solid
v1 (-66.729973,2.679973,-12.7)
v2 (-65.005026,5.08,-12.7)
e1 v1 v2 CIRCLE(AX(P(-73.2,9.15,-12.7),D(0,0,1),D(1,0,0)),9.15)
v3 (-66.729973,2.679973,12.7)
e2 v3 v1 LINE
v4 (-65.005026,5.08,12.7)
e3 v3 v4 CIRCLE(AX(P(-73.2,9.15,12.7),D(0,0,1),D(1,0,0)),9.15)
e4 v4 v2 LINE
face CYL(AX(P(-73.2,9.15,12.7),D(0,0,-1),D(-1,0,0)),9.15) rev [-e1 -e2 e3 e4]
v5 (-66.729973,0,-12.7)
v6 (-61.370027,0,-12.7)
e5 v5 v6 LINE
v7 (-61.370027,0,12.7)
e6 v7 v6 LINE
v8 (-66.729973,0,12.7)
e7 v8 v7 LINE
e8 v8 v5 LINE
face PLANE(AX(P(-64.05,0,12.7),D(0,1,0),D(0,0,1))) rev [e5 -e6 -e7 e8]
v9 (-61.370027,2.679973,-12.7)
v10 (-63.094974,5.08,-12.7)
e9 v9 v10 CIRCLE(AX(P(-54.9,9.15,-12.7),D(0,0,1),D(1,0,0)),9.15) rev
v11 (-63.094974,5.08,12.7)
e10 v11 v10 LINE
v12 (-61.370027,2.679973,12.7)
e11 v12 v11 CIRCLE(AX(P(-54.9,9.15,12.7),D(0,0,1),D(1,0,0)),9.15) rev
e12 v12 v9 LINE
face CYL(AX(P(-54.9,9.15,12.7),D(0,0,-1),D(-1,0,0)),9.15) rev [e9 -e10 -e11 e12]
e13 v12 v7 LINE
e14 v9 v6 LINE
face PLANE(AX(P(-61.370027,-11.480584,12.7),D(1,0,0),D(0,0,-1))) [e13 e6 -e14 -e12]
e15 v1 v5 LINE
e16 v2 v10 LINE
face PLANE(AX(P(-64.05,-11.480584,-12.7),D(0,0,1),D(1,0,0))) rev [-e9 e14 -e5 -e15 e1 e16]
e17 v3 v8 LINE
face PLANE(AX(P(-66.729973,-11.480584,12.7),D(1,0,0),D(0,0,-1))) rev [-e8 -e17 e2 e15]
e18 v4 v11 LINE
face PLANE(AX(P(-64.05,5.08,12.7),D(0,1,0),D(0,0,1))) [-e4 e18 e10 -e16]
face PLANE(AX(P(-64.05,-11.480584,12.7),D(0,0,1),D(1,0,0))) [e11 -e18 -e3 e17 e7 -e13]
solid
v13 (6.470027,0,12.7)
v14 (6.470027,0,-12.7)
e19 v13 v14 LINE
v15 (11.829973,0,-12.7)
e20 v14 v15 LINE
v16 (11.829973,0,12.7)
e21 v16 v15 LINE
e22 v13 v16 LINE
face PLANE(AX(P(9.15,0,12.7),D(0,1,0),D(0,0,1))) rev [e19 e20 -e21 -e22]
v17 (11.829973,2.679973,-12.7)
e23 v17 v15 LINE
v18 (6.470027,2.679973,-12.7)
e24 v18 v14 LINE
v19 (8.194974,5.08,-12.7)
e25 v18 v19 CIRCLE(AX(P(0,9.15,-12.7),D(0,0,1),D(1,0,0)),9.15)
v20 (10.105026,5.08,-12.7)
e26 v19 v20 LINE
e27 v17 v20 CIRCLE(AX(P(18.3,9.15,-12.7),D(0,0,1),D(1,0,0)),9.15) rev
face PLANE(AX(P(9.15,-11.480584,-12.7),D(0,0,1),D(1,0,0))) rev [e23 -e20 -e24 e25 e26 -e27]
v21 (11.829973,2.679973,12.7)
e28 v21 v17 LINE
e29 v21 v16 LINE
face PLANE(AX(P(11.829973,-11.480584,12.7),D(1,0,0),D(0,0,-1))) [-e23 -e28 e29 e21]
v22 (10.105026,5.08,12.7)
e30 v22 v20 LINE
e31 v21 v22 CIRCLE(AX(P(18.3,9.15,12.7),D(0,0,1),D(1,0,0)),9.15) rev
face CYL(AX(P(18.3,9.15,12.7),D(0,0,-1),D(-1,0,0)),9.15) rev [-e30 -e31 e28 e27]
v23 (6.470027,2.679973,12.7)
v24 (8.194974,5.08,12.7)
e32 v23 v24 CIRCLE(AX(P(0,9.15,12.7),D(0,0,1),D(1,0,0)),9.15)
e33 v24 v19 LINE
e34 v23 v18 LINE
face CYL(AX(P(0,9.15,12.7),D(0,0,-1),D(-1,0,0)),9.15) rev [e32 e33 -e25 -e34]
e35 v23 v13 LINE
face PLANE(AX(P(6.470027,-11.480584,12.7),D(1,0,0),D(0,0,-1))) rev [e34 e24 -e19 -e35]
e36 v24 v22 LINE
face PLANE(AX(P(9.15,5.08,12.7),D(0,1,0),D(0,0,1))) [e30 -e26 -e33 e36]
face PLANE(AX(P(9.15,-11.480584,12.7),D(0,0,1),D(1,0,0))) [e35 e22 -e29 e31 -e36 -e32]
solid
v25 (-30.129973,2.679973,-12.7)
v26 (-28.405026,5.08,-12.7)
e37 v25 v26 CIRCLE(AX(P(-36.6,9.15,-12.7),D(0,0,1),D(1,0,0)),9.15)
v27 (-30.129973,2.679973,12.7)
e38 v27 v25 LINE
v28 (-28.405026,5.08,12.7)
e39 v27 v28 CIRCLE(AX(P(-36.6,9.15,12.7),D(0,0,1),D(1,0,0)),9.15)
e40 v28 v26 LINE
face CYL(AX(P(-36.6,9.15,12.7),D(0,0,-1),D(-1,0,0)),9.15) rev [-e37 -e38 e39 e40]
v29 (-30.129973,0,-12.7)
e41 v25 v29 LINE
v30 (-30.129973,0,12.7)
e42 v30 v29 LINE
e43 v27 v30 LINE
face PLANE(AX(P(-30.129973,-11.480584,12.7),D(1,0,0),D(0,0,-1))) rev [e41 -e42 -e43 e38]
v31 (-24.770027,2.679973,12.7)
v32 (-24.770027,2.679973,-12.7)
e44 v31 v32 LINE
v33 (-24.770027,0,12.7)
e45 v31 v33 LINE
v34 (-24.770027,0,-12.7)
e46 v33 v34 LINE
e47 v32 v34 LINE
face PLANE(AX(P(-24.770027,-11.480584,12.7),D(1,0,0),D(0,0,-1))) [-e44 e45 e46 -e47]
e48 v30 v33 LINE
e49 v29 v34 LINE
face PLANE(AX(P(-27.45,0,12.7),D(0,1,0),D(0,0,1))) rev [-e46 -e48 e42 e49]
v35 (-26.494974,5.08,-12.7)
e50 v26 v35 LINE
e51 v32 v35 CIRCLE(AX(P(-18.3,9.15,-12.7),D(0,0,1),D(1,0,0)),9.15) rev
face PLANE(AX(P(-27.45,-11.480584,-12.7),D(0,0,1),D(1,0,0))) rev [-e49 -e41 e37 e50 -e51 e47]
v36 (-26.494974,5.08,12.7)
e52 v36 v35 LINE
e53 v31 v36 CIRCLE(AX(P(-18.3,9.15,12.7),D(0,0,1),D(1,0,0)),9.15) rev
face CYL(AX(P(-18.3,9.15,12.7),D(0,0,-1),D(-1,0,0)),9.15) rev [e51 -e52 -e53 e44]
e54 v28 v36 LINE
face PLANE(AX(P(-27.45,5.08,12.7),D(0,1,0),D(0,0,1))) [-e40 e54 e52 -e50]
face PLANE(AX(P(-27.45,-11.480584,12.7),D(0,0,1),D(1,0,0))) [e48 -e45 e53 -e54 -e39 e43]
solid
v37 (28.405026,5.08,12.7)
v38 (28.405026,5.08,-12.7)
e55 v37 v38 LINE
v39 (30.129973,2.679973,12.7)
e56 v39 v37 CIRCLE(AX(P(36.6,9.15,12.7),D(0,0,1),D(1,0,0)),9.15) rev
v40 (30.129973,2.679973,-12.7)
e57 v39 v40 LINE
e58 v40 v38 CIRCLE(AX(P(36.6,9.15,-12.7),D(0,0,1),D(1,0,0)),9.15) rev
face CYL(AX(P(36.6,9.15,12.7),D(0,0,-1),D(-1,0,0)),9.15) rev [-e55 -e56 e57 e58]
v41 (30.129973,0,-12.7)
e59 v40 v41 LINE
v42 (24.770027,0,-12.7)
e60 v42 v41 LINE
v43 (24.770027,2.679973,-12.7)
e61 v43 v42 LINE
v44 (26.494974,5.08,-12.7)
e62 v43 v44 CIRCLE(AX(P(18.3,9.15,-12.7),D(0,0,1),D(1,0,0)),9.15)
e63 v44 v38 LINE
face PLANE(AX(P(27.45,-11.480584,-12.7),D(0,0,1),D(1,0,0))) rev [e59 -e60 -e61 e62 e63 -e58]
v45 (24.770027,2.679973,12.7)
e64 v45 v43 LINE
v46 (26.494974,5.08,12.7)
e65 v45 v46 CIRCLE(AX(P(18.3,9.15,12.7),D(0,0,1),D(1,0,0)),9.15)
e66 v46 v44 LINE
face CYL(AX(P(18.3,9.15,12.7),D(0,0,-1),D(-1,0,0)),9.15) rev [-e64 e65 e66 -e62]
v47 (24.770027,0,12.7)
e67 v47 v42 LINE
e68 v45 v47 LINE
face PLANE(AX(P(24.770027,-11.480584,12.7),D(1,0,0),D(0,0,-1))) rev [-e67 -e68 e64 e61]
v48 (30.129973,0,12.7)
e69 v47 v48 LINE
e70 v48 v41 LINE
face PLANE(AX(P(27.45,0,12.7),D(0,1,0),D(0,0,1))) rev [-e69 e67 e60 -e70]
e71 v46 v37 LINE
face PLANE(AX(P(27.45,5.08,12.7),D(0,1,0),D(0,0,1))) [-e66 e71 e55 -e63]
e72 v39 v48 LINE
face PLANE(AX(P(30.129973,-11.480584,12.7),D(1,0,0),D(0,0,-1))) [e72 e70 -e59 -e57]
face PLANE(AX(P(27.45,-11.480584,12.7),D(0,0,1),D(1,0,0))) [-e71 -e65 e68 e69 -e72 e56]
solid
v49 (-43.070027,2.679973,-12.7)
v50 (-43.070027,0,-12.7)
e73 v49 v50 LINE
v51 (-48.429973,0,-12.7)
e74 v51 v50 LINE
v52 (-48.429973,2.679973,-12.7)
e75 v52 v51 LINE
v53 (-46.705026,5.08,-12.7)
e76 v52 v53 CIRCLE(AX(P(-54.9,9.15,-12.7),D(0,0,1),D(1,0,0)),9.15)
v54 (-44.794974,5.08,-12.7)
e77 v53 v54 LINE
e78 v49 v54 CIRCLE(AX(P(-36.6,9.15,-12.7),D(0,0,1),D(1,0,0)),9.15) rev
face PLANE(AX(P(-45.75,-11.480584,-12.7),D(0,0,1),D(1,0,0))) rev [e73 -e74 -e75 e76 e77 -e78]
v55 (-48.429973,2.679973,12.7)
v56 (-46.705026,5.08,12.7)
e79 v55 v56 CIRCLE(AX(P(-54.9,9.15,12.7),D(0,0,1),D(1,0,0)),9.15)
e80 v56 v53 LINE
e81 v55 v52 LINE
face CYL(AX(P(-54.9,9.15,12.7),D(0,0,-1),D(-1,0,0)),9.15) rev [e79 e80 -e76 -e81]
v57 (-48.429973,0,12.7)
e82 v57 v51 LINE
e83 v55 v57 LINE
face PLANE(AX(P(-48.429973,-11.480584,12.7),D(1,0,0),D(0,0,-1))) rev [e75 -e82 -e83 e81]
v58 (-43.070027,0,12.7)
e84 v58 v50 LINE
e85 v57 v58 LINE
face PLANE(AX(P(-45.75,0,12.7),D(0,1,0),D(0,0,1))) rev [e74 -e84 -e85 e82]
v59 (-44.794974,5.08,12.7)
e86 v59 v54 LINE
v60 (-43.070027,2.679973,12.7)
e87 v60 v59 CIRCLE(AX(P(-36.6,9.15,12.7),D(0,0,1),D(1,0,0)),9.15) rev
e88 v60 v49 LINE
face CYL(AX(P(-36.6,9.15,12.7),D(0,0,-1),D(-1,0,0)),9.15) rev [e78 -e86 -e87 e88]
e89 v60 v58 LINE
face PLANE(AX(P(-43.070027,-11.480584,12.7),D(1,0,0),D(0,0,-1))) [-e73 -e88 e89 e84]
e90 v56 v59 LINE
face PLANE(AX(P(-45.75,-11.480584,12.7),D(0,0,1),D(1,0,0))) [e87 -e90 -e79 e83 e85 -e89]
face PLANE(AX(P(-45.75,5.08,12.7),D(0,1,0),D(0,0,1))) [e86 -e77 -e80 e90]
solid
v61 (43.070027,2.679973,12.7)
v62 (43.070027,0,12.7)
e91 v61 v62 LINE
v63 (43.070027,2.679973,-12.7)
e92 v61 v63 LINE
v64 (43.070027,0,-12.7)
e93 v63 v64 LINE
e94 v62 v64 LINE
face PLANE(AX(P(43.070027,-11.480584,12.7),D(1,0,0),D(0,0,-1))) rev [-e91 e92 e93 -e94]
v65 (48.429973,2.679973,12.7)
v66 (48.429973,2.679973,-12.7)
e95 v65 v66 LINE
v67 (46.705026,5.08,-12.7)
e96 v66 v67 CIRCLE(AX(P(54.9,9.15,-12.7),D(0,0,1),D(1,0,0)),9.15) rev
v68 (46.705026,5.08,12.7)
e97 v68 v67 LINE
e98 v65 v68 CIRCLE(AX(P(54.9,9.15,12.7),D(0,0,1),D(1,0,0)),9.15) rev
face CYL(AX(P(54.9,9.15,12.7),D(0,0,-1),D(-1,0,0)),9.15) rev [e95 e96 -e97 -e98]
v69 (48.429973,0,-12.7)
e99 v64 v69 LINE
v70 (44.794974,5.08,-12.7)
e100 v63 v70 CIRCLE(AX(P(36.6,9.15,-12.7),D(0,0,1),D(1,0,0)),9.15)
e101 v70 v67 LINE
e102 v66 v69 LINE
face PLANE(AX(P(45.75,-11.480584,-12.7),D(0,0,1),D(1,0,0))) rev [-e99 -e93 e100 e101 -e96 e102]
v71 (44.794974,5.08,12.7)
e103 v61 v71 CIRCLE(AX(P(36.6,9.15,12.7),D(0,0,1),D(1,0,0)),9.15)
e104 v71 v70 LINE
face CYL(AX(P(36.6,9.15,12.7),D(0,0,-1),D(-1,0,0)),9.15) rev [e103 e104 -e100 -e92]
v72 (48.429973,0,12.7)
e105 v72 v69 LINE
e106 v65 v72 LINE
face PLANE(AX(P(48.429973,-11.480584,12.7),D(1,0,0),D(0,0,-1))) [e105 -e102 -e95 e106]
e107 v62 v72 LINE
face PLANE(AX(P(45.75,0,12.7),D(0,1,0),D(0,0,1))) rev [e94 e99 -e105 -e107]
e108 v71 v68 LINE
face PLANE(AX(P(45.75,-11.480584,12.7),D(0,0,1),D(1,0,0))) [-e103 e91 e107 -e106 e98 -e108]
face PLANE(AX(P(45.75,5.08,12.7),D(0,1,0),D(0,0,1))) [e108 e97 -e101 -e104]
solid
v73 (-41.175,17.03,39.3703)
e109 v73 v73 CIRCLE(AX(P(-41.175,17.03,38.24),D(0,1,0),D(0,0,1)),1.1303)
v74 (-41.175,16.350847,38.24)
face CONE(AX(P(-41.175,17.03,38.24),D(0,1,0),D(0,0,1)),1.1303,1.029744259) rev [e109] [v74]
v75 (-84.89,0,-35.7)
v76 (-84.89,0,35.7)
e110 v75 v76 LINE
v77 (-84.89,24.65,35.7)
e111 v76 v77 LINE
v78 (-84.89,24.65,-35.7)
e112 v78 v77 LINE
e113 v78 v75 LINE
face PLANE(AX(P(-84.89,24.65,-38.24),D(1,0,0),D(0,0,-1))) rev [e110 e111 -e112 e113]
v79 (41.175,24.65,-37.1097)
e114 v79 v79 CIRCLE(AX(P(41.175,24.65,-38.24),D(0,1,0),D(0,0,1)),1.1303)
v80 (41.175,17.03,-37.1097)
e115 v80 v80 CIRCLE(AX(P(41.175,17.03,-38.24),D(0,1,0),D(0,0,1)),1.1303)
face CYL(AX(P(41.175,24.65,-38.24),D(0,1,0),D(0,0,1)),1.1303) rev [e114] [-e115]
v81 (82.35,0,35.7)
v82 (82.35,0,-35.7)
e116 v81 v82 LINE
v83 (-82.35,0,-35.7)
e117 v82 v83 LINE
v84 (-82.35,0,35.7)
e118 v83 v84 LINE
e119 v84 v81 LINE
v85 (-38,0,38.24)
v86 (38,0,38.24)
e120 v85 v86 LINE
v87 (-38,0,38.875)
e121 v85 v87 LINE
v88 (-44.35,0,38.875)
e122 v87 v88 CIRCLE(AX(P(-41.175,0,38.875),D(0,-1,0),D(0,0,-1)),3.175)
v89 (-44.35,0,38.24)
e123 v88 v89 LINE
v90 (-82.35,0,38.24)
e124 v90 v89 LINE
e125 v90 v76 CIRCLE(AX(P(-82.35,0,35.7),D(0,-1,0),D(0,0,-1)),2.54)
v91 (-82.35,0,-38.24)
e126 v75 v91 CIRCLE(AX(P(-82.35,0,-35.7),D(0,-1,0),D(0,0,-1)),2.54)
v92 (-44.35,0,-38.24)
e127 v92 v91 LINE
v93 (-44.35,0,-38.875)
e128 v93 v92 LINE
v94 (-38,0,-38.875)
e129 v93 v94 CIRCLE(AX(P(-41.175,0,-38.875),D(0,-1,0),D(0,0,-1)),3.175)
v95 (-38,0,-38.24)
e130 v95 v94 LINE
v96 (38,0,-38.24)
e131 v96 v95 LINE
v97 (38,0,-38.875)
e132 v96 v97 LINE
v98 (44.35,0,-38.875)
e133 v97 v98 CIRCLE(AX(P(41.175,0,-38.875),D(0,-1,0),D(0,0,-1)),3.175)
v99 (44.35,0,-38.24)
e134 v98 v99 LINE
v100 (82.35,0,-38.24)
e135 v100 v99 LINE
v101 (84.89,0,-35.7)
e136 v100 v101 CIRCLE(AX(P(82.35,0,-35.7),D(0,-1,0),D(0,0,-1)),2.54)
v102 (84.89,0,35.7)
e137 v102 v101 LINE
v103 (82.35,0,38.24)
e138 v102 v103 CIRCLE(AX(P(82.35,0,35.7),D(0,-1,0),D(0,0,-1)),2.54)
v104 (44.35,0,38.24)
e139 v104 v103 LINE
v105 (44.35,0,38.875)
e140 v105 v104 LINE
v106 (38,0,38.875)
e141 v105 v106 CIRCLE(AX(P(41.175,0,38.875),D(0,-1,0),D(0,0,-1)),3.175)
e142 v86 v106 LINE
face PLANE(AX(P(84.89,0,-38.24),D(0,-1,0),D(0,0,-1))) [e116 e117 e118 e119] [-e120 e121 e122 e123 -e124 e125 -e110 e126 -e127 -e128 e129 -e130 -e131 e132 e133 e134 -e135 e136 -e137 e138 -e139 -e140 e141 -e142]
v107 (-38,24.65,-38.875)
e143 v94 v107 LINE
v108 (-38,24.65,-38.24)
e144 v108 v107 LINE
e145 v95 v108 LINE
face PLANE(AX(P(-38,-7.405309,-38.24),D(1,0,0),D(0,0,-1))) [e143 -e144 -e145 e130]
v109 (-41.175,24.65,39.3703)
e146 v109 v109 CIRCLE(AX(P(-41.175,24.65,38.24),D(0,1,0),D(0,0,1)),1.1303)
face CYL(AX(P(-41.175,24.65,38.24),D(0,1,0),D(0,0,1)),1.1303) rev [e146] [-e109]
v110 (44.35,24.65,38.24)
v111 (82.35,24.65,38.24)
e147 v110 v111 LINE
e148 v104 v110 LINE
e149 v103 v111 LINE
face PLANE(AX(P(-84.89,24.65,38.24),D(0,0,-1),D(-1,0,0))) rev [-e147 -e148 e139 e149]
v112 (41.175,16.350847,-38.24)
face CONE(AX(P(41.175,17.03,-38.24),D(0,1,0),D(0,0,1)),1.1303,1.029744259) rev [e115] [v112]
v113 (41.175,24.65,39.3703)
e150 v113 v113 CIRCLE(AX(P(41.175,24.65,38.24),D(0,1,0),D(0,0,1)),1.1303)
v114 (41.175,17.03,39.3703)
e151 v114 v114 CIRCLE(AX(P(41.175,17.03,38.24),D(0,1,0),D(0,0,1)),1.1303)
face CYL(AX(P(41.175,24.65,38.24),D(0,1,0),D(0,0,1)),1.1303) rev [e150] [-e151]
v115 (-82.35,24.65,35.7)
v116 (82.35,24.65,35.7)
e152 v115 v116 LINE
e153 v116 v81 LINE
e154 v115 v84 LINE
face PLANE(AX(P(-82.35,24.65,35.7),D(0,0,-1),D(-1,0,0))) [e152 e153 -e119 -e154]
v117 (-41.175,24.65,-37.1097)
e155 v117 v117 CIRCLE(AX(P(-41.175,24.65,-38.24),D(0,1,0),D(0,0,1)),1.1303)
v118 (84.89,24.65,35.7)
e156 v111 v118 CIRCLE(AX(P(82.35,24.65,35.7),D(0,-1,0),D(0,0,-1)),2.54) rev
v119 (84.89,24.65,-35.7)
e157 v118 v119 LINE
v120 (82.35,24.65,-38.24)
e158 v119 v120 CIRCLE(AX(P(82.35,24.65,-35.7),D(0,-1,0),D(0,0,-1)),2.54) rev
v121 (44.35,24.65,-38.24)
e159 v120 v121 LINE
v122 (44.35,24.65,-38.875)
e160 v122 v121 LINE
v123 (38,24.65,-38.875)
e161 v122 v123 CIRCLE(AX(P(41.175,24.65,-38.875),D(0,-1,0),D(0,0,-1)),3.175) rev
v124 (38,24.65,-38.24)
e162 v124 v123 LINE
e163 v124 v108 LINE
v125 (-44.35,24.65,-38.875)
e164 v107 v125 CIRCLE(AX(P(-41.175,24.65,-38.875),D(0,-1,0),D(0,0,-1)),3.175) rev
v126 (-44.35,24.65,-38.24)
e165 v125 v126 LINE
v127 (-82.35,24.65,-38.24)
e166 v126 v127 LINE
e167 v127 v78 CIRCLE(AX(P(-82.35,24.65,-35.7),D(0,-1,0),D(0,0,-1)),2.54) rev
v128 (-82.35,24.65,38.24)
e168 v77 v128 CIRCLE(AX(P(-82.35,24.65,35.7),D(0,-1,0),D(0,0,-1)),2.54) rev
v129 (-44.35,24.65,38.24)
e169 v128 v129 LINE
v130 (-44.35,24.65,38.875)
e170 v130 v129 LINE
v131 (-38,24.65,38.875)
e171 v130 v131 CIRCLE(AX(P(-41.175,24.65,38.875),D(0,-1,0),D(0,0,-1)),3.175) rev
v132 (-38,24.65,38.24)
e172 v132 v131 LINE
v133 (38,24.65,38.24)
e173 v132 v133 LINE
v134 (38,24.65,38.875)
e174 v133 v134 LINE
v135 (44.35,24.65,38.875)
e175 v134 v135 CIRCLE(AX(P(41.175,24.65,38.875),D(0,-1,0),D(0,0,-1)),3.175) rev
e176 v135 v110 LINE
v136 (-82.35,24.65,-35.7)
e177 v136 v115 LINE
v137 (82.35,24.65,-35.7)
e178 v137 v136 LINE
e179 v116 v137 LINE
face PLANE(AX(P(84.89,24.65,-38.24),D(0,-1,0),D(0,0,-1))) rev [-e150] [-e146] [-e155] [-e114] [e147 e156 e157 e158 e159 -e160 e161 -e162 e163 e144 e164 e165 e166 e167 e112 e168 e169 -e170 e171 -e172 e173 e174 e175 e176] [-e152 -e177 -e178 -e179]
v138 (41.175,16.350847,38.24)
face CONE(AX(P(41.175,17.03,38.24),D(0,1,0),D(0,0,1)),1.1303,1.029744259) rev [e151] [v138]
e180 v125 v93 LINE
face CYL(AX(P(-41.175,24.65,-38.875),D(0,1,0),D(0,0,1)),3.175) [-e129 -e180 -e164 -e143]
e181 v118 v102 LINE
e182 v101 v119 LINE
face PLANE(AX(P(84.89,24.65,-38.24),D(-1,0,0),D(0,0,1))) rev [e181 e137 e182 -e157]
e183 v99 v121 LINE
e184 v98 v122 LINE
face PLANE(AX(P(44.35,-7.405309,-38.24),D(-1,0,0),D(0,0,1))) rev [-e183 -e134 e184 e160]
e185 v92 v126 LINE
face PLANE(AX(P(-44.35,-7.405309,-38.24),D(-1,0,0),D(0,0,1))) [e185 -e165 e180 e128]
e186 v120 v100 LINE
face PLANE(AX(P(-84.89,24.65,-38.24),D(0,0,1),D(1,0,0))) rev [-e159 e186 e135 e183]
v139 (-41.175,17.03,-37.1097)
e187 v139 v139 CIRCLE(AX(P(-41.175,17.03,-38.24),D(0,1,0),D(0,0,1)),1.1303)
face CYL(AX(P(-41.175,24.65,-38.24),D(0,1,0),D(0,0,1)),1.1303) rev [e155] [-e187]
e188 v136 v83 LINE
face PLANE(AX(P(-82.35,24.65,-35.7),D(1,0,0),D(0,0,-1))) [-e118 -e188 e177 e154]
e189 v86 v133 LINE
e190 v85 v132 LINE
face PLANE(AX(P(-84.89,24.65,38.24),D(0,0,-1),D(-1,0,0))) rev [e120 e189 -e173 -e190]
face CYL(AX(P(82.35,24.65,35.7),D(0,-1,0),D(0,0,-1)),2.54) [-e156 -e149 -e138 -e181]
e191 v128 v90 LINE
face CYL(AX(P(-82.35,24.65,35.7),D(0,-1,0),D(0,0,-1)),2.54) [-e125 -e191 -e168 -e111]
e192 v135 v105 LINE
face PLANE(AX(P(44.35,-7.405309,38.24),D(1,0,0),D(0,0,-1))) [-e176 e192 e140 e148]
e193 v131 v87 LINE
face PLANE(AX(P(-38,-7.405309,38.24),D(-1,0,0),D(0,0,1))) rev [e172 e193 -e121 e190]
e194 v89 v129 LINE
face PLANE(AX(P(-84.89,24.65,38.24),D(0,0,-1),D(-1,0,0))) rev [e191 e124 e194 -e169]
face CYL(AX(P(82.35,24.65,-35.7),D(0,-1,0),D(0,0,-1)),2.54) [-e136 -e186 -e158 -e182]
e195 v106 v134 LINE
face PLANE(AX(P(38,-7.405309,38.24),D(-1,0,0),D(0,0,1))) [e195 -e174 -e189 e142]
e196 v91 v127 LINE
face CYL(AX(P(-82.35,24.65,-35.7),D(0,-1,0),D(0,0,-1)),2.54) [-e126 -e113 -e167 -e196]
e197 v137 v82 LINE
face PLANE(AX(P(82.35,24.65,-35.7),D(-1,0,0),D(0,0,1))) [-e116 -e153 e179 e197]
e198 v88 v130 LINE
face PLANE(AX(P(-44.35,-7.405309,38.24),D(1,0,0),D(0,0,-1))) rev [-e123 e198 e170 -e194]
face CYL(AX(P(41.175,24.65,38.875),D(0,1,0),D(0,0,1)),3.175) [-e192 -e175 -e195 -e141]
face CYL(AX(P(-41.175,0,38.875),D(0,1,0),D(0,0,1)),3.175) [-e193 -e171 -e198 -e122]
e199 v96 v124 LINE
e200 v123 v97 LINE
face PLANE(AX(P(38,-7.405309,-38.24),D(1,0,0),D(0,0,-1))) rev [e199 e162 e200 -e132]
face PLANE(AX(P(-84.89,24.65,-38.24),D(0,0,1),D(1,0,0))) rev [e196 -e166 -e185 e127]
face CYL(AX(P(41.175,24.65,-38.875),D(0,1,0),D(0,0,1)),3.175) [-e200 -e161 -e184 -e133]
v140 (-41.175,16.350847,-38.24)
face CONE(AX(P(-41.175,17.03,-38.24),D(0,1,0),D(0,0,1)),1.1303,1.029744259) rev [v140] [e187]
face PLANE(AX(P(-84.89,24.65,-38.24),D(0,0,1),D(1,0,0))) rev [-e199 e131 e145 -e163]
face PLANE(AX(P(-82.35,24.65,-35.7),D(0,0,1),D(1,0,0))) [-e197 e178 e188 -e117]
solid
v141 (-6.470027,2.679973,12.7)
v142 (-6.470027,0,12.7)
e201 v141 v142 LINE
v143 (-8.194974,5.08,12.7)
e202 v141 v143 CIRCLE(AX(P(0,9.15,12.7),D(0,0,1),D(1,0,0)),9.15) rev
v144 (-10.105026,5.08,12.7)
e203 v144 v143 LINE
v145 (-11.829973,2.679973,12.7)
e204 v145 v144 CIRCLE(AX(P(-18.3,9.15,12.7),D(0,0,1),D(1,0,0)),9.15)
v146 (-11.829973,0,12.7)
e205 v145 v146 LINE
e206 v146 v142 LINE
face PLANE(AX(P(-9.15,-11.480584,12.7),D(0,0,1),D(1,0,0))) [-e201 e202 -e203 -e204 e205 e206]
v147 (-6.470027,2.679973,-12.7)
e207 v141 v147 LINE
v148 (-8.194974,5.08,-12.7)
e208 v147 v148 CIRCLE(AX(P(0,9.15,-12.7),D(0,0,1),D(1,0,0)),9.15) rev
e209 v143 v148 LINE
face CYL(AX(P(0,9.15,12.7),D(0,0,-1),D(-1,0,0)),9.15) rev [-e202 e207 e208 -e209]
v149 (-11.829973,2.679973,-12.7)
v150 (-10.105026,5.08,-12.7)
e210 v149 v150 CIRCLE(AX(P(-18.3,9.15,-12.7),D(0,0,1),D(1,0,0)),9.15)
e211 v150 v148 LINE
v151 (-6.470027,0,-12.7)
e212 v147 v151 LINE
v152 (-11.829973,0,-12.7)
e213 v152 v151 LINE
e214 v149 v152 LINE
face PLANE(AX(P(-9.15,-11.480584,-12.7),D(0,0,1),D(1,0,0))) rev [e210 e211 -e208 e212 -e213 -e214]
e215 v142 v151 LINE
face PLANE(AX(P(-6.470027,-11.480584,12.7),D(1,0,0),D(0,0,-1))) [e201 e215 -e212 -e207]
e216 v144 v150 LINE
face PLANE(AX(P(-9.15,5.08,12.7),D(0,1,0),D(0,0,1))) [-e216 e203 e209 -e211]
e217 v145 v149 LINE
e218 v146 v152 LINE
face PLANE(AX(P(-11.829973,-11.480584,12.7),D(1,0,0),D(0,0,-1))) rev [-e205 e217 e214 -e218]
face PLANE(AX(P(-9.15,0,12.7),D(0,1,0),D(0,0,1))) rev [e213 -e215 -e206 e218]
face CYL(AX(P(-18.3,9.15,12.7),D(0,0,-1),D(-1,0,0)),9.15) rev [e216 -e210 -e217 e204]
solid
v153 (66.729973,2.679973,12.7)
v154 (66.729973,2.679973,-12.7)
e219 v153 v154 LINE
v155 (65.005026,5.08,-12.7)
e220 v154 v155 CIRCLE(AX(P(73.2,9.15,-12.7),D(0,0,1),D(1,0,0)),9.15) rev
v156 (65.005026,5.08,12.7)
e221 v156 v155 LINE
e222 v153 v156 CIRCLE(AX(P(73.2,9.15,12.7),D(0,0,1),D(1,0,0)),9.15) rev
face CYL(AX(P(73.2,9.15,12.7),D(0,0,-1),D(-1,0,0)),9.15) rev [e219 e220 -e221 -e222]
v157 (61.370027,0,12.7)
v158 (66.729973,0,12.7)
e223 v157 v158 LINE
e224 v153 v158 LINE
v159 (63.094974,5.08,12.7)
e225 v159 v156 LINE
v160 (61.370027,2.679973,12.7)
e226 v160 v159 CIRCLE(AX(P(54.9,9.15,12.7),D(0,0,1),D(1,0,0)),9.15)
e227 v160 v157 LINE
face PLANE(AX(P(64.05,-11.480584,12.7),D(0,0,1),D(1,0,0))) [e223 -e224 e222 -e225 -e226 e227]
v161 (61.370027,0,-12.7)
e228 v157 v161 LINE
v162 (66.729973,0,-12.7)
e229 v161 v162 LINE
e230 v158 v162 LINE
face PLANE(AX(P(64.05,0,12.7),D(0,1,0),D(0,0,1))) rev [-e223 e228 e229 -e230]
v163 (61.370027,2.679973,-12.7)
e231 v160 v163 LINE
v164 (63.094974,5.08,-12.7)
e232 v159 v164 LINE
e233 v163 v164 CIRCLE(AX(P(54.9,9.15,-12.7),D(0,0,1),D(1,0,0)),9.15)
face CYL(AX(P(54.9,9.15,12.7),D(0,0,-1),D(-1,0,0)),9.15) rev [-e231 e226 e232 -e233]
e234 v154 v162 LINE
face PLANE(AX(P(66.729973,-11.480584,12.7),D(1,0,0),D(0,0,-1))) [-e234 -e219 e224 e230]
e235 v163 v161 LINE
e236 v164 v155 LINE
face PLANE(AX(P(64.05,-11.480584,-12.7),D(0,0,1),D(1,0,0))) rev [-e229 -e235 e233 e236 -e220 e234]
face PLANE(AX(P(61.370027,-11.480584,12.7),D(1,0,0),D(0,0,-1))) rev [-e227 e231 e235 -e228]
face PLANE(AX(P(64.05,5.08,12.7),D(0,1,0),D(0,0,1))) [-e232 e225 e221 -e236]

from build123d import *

# Parameters (mm, degrees)
BOSS_EXTRUDE1_OUTLINE_W        = 169.78
BOSS_EXTRUDE1_OUTLINE_H        = 76.48
BOSS_EXTRUDE1_OUTLINE_W_2      = 164.7
BOSS_EXTRUDE1_OUTLINE_H_2      = 71.4
BOSS_EXTRUDE1_DEPTH            = 24.65
BOSS_EXTRUDE2_DEPTH            = 12.7
LPATTERN2_COUNT                = 8
LPATTERN2_PITCH                = 18.3
SKETCH6_W                      = 6.35
SKETCH6_H                      = 3.81
BOSS_EXTRUDE3_DEPTH            = 24.65
MIRROR2_COPY_1_SKETCH_W        = 6.35
MIRROR2_COPY_1_SKETCH_H        = 3.81
MIRROR2_COPY_1_DEPTH           = 24.65
F_4_40_TAPPED_HOLE1_AT_2_COUNT = 2
F_4_40_TAPPED_HOLE1_AT_2_PITCH = 82.35
F_4_40_TAPPED_HOLE1_AT_3_COUNT = 2
F_4_40_TAPPED_HOLE1_AT_3_PITCH = 112.386444467
F_4_40_TAPPED_HOLE1_AT_4_COUNT = 2
F_4_40_TAPPED_HOLE1_AT_4_PITCH = 76.48
FILLET1_RADIUS                 = 3.175
FILLET1_LENGTH                 = 24.65
FILLET2_RADIUS                 = 3.175
FILLET2_LENGTH                 = 24.65
FILLET3_RADIUS                 = 3.175
FILLET3_LENGTH                 = 24.65
FILLET4_RADIUS                 = 3.175
FILLET4_LENGTH                 = 24.65
FILLET5_R                      = 2.54


# Read off the part's stored shape, not the designer's step: Boss-Extrude1
with BuildPart() as part:
    # Boss-Extrude1 outline → Boss-Extrude1 (new body)
    with BuildSketch(Plane(origin=(0, 0, 0), x_dir=(1, 0, 0), z_dir=(0, 1, 0))):
        Rectangle(BOSS_EXTRUDE1_OUTLINE_W, BOSS_EXTRUDE1_OUTLINE_H)
        Rectangle(BOSS_EXTRUDE1_OUTLINE_W_2, BOSS_EXTRUDE1_OUTLINE_H_2, mode=Mode.SUBTRACT)
    extrude(amount=BOSS_EXTRUDE1_DEPTH)

    # Sketch6 → Boss-Extrude3 (add)
    with BuildSketch(Plane(origin=(0, 24.65, 0), x_dir=(1, 0, 0), z_dir=(0, 1, 0))):
        with Locations((-41.175, 40.145)):
            Rectangle(SKETCH6_W, SKETCH6_H)
    boss_extrude3 = extrude(amount=-BOSS_EXTRUDE3_DEPTH)

    # Mirror1: Boss-Extrude3 across plane
    add(boss_extrude3.mirror(Plane(origin=(0, 0, 0), x_dir=(0, 0, 1), z_dir=(1, 0, 0))))

    # Mirror2: Boss-Extrude3 across plane
    add(boss_extrude3.mirror(Plane.XY))

    # Mirror2 copy 1 sketch → Mirror2 copy 1 (add)
    with BuildSketch(Plane(origin=(0, 24.65, 0), x_dir=(-1, 0, 0), z_dir=(0, 1, 0))):
        with Locations((-41.175, 40.145)):
            Rectangle(MIRROR2_COPY_1_SKETCH_W, MIRROR2_COPY_1_SKETCH_H)
    extrude(amount=-MIRROR2_COPY_1_DEPTH)

    # Sketch7 → #4-40 Tapped Hole1 (revolve, cut)
    with BuildSketch(Plane(origin=(-41.175, 24.65, -38.24), x_dir=(0, 0, 1), z_dir=(1, 0, 0))):
        Polygon((0, 0), (0, 8.299152758), (1.1303, 7.62), (1.1303, 0), align=None)
    f_4_40_tapped_hole1 = revolve(axis=Axis((-41.175, 31, -38.24), (0, -1, 0)), mode=Mode.SUBTRACT)

    # #4-40 Tapped Hole1 at 2: #4-40 Tapped Hole1 ×2
    with Locations(*[(i * F_4_40_TAPPED_HOLE1_AT_2_PITCH, 0, 0) for i in range(1, F_4_40_TAPPED_HOLE1_AT_2_COUNT)]):
        add(f_4_40_tapped_hole1, mode=Mode.SUBTRACT)

    # #4-40 Tapped Hole1 at 3: #4-40 Tapped Hole1 ×2
    with Locations(*[Vector(0.732739614553475, 0, 0.6805091162240408) * (i * F_4_40_TAPPED_HOLE1_AT_3_PITCH) for i in range(1, F_4_40_TAPPED_HOLE1_AT_3_COUNT)]):
        add(f_4_40_tapped_hole1, mode=Mode.SUBTRACT)

    # #4-40 Tapped Hole1 at 4: #4-40 Tapped Hole1 ×2
    with Locations(*[(0, 0, i * F_4_40_TAPPED_HOLE1_AT_4_PITCH) for i in range(1, F_4_40_TAPPED_HOLE1_AT_4_COUNT)]):
        add(f_4_40_tapped_hole1, mode=Mode.SUBTRACT)

    # Fillet1: full round fillet: the end face becomes a half cylinder, R = half its width
    fillet1_face = Plane((-41.175, 12.325, -42.05), x_dir=(0, -1, 0), z_dir=(0, 0, -1))  # on the end face: x along it, z out of the body
    fillet1_slab = fillet1_face.offset(-FILLET1_RADIUS / 2) * Box(FILLET1_LENGTH, 2 * FILLET1_RADIUS, FILLET1_RADIUS, mode=Mode.PRIVATE)  # the body's end, R deep
    fillet1_round = Plane((-41.175, 12.325, -38.875), x_dir=(0, 0, -1), z_dir=(0, -1, 0)) * Cylinder(FILLET1_RADIUS, FILLET1_LENGTH, mode=Mode.PRIVATE)  # its axis R under the face
    add(fillet1_slab - fillet1_round, mode=Mode.SUBTRACT)

    # Fillet2: full round fillet: the end face becomes a half cylinder, R = half its width
    fillet2_face = Plane((41.175, 12.325, -42.05), x_dir=(0, -1, 0), z_dir=(0, 0, -1))  # on the end face: x along it, z out of the body
    fillet2_slab = fillet2_face.offset(-FILLET2_RADIUS / 2) * Box(FILLET2_LENGTH, 2 * FILLET2_RADIUS, FILLET2_RADIUS, mode=Mode.PRIVATE)  # the body's end, R deep
    fillet2_round = Plane((41.175, 12.325, -38.875), x_dir=(0, 0, -1), z_dir=(0, -1, 0)) * Cylinder(FILLET2_RADIUS, FILLET2_LENGTH, mode=Mode.PRIVATE)  # its axis R under the face
    add(fillet2_slab - fillet2_round, mode=Mode.SUBTRACT)

    # Fillet3: full round fillet: the end face becomes a half cylinder, R = half its width
    fillet3_face = Plane((41.175, 12.325, 42.05), x_dir=(0, -1, 0), z_dir=(0, 0, 1))  # on the end face: x along it, z out of the body
    fillet3_slab = fillet3_face.offset(-FILLET3_RADIUS / 2) * Box(FILLET3_LENGTH, 2 * FILLET3_RADIUS, FILLET3_RADIUS, mode=Mode.PRIVATE)  # the body's end, R deep
    fillet3_round = Plane((41.175, 12.325, 38.875), x_dir=(0, 0, 1), z_dir=(0, -1, 0)) * Cylinder(FILLET3_RADIUS, FILLET3_LENGTH, mode=Mode.PRIVATE)  # its axis R under the face
    add(fillet3_slab - fillet3_round, mode=Mode.SUBTRACT)

    # Fillet4: full round fillet: the end face becomes a half cylinder, R = half its width
    fillet4_face = Plane((-41.175, 12.325, 42.05), x_dir=(0, -1, 0), z_dir=(0, 0, 1))  # on the end face: x along it, z out of the body
    fillet4_slab = fillet4_face.offset(-FILLET4_RADIUS / 2) * Box(FILLET4_LENGTH, 2 * FILLET4_RADIUS, FILLET4_RADIUS, mode=Mode.PRIVATE)  # the body's end, R deep
    fillet4_round = Plane((-41.175, 12.325, 38.875), x_dir=(0, 0, 1), z_dir=(0, -1, 0)) * Cylinder(FILLET4_RADIUS, FILLET4_LENGTH, mode=Mode.PRIVATE)  # its axis R under the face
    add(fillet4_slab - fillet4_round, mode=Mode.SUBTRACT)

    # Fillet5
    fillet5_edges = [part.edges().sort_by_distance(p)[0] for p in [
        (84.89, 12.325, 38.24),
        (84.89, 12.325, -38.24),
        (-84.89, 12.325, -38.24),
        (-84.89, 12.325, 38.24),
    ]]
    fillet(fillet5_edges, radius=FILLET5_R)


with BuildPart() as body_2:
    # Sketch4 → Boss-Extrude2 (new, symmetric)
    with BuildSketch(Plane.XY):
        with BuildLine():
            Line((-66.729972952, 0), (-61.370027048, 0))
            Line((-61.370027048, 0), (-61.370027048, 2.679972952))
            ThreePointArc((-61.370027048, 2.679972952), (-62.330046898, 3.809877988), (-63.09497407, 5.08))
            Line((-63.09497407, 5.08), (-65.00502593, 5.08))
            ThreePointArc((-65.00502593, 5.08), (-65.769953102, 3.809877988), (-66.729972952, 2.679972952))
            Line((-66.729972952, 2.679972952), (-66.729972952, 0))
        make_face()
    extrude(amount=BOSS_EXTRUDE2_DEPTH, both=True)


with BuildPart() as lpattern2_1:
    # LPattern2: pattern copy
    add(body_2.part.moved(Location(Vector(1, 0, 0) * (1 * LPATTERN2_PITCH))))


with BuildPart() as lpattern2_2:
    # LPattern2: pattern copy
    add(body_2.part.moved(Location(Vector(1, 0, 0) * (2 * LPATTERN2_PITCH))))


with BuildPart() as lpattern2_3:
    # LPattern2: pattern copy
    add(body_2.part.moved(Location(Vector(1, 0, 0) * (3 * LPATTERN2_PITCH))))


with BuildPart() as lpattern2_4:
    # LPattern2: pattern copy
    add(body_2.part.moved(Location(Vector(1, 0, 0) * (4 * LPATTERN2_PITCH))))


with BuildPart() as lpattern2_5:
    # LPattern2: pattern copy
    add(body_2.part.moved(Location(Vector(1, 0, 0) * (5 * LPATTERN2_PITCH))))


with BuildPart() as lpattern2_6:
    # LPattern2: pattern copy
    add(body_2.part.moved(Location(Vector(1, 0, 0) * (6 * LPATTERN2_PITCH))))


with BuildPart() as lpattern2_7:
    # LPattern2: pattern copy
    add(body_2.part.moved(Location(Vector(1, 0, 0) * (7 * LPATTERN2_PITCH))))


solid = Compound([part.part, body_2.part, lpattern2_1.part, lpattern2_2.part, lpattern2_3.part, lpattern2_4.part, lpattern2_5.part, lpattern2_6.part, lpattern2_7.part])
